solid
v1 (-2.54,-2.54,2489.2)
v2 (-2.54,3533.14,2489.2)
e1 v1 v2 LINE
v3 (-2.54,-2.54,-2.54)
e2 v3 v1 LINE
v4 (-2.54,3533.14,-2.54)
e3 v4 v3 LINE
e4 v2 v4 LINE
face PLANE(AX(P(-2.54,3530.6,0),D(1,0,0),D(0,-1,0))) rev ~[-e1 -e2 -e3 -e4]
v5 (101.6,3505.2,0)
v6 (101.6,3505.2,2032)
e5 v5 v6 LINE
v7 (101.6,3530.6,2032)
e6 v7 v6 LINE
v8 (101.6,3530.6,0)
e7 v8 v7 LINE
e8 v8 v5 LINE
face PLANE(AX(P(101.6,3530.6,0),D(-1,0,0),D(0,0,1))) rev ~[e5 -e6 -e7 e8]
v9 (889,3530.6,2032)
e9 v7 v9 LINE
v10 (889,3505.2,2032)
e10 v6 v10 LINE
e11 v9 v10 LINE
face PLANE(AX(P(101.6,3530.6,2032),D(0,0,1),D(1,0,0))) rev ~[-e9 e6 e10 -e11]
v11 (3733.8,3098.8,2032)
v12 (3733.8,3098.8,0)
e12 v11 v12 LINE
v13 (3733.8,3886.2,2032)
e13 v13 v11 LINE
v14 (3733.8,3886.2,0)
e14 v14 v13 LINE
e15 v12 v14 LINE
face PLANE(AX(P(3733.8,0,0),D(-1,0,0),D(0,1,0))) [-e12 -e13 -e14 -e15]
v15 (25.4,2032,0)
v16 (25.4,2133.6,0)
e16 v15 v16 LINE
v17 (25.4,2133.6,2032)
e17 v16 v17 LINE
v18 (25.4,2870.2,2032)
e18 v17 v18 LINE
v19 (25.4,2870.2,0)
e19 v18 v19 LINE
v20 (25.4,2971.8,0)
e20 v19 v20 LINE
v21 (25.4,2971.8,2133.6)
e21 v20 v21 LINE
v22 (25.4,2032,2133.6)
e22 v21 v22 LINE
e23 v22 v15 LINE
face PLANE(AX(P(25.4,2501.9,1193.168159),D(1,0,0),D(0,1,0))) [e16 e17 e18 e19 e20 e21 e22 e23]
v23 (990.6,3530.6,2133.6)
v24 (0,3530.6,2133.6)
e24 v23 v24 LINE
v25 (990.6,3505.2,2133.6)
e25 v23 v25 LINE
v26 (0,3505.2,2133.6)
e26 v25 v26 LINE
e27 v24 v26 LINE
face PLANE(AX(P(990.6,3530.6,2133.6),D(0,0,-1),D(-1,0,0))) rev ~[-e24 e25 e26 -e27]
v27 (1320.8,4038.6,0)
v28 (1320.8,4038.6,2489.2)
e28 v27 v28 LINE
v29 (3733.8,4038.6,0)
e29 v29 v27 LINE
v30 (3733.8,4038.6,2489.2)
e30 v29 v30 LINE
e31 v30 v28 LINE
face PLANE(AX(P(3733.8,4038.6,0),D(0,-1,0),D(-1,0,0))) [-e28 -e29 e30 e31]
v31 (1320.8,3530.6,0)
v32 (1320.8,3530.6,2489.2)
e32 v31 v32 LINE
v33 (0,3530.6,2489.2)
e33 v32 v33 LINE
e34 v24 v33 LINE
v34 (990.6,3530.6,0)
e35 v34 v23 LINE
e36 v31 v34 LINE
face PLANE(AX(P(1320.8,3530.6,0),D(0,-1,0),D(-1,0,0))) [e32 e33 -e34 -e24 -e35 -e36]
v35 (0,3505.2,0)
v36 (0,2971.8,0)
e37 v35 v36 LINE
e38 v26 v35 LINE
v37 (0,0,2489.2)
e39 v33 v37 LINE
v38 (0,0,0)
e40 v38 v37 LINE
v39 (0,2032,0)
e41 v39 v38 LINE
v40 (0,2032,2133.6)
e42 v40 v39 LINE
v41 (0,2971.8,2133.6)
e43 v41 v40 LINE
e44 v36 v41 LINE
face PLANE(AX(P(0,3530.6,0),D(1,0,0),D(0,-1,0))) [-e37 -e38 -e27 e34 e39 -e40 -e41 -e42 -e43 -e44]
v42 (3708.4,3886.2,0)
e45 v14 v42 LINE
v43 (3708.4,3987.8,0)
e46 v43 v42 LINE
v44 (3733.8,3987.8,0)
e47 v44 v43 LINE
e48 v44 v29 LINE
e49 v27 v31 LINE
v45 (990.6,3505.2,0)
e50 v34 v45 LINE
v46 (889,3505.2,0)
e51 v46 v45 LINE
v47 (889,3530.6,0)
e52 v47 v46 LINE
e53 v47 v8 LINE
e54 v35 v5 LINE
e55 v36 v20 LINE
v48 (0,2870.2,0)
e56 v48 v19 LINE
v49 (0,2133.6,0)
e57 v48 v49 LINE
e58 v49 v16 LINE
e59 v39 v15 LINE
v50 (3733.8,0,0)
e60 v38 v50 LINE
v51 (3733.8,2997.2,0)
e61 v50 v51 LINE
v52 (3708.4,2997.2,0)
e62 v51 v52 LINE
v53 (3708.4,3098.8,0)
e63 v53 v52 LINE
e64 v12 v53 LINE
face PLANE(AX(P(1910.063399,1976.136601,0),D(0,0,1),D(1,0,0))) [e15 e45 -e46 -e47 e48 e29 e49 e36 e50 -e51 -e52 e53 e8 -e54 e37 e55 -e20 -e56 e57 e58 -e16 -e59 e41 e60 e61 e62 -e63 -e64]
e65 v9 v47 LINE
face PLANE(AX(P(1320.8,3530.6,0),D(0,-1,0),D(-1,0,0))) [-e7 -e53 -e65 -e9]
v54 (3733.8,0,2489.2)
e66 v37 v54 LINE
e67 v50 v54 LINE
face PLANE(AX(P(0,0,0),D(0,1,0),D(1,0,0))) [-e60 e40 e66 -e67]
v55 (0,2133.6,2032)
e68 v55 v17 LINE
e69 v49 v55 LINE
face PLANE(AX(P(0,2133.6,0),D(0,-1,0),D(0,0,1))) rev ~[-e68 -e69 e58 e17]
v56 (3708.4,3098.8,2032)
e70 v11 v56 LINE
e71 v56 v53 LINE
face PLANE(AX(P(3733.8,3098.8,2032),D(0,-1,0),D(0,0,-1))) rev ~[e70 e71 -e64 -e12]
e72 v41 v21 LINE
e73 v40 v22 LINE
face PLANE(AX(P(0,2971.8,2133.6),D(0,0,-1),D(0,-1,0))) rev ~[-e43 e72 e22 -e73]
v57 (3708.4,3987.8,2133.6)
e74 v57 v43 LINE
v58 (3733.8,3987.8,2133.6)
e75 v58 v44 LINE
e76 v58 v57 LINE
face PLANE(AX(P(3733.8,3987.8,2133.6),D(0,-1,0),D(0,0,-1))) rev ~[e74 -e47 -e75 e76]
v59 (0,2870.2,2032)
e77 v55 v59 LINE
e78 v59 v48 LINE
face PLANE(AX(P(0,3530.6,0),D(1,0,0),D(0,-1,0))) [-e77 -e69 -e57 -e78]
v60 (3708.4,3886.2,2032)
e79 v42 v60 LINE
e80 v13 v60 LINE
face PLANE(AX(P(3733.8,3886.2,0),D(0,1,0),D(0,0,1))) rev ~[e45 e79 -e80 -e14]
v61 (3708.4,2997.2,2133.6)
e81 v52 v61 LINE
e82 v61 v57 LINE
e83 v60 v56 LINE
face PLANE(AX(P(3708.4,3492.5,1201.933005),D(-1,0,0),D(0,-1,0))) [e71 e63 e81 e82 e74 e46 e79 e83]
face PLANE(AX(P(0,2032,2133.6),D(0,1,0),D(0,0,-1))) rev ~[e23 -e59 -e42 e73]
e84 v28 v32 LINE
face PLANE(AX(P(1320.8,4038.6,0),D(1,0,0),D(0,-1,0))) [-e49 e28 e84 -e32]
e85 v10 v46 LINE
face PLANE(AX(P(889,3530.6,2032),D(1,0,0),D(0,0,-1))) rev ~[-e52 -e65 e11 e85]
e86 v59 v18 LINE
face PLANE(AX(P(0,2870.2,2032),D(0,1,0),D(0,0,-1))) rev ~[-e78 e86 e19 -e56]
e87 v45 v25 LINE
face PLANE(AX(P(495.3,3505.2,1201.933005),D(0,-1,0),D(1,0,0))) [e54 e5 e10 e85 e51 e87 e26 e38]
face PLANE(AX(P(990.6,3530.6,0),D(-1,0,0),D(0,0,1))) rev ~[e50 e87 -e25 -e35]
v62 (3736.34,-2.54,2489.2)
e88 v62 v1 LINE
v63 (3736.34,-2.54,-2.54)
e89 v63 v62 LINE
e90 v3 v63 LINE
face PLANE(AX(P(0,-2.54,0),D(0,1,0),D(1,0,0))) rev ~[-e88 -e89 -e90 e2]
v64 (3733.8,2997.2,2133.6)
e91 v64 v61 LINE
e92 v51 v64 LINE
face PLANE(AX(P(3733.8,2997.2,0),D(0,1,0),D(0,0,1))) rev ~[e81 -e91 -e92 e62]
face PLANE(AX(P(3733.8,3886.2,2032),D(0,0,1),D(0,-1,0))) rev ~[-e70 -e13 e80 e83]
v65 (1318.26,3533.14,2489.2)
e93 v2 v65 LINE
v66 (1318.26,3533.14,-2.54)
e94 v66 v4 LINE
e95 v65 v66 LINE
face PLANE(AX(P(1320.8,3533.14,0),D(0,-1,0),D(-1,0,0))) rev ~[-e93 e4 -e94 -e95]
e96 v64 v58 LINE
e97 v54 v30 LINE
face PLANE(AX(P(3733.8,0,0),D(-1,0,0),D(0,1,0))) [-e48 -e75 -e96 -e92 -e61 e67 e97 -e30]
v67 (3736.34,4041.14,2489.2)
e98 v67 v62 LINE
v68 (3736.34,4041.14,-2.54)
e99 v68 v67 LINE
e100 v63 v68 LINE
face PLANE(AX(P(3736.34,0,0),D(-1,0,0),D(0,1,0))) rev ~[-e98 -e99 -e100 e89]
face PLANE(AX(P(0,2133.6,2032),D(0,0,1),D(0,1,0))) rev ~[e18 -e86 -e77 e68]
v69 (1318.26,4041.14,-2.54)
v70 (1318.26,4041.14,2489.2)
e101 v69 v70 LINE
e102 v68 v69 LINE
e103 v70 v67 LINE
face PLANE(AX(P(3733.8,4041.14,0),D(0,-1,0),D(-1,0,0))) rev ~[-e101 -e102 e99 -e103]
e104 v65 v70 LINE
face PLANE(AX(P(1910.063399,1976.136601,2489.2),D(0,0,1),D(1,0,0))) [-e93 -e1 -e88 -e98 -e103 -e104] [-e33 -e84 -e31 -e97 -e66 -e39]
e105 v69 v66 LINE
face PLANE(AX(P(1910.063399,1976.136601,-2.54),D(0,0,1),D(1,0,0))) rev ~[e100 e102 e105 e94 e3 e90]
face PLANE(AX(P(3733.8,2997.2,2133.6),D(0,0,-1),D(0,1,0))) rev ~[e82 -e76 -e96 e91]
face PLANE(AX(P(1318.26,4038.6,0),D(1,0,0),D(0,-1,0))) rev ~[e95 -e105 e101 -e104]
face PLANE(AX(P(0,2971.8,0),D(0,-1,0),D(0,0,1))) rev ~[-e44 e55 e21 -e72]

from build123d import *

# Parameters (mm, degrees)
F1_DEPTH = 2489.2
F2_T     = 2.54
F4_DEPTH = 25.4
F6_DEPTH = 25.4
F8_DEPTH = 25.4


with BuildPart() as f1:
    # F0 (on Top) → F1 (new body)
    with BuildSketch(Plane.XY):
        Polygon((0, 3530.6), (0, 0), (3733.8, 0), (3733.8, 4038.6), (1320.8, 4038.6), (1320.8, 3530.6), align=None)
    extrude(amount=F1_DEPTH)

    # F2
    f2_openings = [f1.faces().sort_by_distance(p)[0] for p in [
        (1923.084122, 1937.093758, 2489.2),
    ]]
    offset(amount=F2_T, openings=f2_openings, kind=Kind.INTERSECTION)

    # F3 (on face) → F4 (join)
    with BuildSketch(Plane(origin=(3733.8, 0, 0), x_dir=(0, -1, 0), z_dir=(-1, 0, 0))):
        Polygon((-3987.8, 2133.6), (-3987.8, 0), (-3886.2, 0), (-3886.2, 2032), (-3098.8, 2032), (-3098.8, 0), (-2997.2, 0), (-2997.2, 2133.6), align=None)
    extrude(amount=F4_DEPTH)

    # F5 (on face) → F6 (join)
    with BuildSketch(Plane.XZ.offset(-3530.6)):
        Polygon((0, 2133.6), (0, 0), (101.6, 0), (101.6, 2032), (889, 2032), (889, 0), (990.6, 0), (990.6, 2133.6), align=None)
    extrude(amount=F6_DEPTH)

    # F7 (on face) → F8 (join)
    with BuildSketch(Plane.YZ):
        Polygon((2032, 2133.6), (2032, 0), (2133.6, 0), (2133.6, 2032), (2870.2, 2032), (2870.2, 0), (2971.8, 0), (2971.8, 2133.6), align=None)
    extrude(amount=F8_DEPTH)


solid = f1.part
